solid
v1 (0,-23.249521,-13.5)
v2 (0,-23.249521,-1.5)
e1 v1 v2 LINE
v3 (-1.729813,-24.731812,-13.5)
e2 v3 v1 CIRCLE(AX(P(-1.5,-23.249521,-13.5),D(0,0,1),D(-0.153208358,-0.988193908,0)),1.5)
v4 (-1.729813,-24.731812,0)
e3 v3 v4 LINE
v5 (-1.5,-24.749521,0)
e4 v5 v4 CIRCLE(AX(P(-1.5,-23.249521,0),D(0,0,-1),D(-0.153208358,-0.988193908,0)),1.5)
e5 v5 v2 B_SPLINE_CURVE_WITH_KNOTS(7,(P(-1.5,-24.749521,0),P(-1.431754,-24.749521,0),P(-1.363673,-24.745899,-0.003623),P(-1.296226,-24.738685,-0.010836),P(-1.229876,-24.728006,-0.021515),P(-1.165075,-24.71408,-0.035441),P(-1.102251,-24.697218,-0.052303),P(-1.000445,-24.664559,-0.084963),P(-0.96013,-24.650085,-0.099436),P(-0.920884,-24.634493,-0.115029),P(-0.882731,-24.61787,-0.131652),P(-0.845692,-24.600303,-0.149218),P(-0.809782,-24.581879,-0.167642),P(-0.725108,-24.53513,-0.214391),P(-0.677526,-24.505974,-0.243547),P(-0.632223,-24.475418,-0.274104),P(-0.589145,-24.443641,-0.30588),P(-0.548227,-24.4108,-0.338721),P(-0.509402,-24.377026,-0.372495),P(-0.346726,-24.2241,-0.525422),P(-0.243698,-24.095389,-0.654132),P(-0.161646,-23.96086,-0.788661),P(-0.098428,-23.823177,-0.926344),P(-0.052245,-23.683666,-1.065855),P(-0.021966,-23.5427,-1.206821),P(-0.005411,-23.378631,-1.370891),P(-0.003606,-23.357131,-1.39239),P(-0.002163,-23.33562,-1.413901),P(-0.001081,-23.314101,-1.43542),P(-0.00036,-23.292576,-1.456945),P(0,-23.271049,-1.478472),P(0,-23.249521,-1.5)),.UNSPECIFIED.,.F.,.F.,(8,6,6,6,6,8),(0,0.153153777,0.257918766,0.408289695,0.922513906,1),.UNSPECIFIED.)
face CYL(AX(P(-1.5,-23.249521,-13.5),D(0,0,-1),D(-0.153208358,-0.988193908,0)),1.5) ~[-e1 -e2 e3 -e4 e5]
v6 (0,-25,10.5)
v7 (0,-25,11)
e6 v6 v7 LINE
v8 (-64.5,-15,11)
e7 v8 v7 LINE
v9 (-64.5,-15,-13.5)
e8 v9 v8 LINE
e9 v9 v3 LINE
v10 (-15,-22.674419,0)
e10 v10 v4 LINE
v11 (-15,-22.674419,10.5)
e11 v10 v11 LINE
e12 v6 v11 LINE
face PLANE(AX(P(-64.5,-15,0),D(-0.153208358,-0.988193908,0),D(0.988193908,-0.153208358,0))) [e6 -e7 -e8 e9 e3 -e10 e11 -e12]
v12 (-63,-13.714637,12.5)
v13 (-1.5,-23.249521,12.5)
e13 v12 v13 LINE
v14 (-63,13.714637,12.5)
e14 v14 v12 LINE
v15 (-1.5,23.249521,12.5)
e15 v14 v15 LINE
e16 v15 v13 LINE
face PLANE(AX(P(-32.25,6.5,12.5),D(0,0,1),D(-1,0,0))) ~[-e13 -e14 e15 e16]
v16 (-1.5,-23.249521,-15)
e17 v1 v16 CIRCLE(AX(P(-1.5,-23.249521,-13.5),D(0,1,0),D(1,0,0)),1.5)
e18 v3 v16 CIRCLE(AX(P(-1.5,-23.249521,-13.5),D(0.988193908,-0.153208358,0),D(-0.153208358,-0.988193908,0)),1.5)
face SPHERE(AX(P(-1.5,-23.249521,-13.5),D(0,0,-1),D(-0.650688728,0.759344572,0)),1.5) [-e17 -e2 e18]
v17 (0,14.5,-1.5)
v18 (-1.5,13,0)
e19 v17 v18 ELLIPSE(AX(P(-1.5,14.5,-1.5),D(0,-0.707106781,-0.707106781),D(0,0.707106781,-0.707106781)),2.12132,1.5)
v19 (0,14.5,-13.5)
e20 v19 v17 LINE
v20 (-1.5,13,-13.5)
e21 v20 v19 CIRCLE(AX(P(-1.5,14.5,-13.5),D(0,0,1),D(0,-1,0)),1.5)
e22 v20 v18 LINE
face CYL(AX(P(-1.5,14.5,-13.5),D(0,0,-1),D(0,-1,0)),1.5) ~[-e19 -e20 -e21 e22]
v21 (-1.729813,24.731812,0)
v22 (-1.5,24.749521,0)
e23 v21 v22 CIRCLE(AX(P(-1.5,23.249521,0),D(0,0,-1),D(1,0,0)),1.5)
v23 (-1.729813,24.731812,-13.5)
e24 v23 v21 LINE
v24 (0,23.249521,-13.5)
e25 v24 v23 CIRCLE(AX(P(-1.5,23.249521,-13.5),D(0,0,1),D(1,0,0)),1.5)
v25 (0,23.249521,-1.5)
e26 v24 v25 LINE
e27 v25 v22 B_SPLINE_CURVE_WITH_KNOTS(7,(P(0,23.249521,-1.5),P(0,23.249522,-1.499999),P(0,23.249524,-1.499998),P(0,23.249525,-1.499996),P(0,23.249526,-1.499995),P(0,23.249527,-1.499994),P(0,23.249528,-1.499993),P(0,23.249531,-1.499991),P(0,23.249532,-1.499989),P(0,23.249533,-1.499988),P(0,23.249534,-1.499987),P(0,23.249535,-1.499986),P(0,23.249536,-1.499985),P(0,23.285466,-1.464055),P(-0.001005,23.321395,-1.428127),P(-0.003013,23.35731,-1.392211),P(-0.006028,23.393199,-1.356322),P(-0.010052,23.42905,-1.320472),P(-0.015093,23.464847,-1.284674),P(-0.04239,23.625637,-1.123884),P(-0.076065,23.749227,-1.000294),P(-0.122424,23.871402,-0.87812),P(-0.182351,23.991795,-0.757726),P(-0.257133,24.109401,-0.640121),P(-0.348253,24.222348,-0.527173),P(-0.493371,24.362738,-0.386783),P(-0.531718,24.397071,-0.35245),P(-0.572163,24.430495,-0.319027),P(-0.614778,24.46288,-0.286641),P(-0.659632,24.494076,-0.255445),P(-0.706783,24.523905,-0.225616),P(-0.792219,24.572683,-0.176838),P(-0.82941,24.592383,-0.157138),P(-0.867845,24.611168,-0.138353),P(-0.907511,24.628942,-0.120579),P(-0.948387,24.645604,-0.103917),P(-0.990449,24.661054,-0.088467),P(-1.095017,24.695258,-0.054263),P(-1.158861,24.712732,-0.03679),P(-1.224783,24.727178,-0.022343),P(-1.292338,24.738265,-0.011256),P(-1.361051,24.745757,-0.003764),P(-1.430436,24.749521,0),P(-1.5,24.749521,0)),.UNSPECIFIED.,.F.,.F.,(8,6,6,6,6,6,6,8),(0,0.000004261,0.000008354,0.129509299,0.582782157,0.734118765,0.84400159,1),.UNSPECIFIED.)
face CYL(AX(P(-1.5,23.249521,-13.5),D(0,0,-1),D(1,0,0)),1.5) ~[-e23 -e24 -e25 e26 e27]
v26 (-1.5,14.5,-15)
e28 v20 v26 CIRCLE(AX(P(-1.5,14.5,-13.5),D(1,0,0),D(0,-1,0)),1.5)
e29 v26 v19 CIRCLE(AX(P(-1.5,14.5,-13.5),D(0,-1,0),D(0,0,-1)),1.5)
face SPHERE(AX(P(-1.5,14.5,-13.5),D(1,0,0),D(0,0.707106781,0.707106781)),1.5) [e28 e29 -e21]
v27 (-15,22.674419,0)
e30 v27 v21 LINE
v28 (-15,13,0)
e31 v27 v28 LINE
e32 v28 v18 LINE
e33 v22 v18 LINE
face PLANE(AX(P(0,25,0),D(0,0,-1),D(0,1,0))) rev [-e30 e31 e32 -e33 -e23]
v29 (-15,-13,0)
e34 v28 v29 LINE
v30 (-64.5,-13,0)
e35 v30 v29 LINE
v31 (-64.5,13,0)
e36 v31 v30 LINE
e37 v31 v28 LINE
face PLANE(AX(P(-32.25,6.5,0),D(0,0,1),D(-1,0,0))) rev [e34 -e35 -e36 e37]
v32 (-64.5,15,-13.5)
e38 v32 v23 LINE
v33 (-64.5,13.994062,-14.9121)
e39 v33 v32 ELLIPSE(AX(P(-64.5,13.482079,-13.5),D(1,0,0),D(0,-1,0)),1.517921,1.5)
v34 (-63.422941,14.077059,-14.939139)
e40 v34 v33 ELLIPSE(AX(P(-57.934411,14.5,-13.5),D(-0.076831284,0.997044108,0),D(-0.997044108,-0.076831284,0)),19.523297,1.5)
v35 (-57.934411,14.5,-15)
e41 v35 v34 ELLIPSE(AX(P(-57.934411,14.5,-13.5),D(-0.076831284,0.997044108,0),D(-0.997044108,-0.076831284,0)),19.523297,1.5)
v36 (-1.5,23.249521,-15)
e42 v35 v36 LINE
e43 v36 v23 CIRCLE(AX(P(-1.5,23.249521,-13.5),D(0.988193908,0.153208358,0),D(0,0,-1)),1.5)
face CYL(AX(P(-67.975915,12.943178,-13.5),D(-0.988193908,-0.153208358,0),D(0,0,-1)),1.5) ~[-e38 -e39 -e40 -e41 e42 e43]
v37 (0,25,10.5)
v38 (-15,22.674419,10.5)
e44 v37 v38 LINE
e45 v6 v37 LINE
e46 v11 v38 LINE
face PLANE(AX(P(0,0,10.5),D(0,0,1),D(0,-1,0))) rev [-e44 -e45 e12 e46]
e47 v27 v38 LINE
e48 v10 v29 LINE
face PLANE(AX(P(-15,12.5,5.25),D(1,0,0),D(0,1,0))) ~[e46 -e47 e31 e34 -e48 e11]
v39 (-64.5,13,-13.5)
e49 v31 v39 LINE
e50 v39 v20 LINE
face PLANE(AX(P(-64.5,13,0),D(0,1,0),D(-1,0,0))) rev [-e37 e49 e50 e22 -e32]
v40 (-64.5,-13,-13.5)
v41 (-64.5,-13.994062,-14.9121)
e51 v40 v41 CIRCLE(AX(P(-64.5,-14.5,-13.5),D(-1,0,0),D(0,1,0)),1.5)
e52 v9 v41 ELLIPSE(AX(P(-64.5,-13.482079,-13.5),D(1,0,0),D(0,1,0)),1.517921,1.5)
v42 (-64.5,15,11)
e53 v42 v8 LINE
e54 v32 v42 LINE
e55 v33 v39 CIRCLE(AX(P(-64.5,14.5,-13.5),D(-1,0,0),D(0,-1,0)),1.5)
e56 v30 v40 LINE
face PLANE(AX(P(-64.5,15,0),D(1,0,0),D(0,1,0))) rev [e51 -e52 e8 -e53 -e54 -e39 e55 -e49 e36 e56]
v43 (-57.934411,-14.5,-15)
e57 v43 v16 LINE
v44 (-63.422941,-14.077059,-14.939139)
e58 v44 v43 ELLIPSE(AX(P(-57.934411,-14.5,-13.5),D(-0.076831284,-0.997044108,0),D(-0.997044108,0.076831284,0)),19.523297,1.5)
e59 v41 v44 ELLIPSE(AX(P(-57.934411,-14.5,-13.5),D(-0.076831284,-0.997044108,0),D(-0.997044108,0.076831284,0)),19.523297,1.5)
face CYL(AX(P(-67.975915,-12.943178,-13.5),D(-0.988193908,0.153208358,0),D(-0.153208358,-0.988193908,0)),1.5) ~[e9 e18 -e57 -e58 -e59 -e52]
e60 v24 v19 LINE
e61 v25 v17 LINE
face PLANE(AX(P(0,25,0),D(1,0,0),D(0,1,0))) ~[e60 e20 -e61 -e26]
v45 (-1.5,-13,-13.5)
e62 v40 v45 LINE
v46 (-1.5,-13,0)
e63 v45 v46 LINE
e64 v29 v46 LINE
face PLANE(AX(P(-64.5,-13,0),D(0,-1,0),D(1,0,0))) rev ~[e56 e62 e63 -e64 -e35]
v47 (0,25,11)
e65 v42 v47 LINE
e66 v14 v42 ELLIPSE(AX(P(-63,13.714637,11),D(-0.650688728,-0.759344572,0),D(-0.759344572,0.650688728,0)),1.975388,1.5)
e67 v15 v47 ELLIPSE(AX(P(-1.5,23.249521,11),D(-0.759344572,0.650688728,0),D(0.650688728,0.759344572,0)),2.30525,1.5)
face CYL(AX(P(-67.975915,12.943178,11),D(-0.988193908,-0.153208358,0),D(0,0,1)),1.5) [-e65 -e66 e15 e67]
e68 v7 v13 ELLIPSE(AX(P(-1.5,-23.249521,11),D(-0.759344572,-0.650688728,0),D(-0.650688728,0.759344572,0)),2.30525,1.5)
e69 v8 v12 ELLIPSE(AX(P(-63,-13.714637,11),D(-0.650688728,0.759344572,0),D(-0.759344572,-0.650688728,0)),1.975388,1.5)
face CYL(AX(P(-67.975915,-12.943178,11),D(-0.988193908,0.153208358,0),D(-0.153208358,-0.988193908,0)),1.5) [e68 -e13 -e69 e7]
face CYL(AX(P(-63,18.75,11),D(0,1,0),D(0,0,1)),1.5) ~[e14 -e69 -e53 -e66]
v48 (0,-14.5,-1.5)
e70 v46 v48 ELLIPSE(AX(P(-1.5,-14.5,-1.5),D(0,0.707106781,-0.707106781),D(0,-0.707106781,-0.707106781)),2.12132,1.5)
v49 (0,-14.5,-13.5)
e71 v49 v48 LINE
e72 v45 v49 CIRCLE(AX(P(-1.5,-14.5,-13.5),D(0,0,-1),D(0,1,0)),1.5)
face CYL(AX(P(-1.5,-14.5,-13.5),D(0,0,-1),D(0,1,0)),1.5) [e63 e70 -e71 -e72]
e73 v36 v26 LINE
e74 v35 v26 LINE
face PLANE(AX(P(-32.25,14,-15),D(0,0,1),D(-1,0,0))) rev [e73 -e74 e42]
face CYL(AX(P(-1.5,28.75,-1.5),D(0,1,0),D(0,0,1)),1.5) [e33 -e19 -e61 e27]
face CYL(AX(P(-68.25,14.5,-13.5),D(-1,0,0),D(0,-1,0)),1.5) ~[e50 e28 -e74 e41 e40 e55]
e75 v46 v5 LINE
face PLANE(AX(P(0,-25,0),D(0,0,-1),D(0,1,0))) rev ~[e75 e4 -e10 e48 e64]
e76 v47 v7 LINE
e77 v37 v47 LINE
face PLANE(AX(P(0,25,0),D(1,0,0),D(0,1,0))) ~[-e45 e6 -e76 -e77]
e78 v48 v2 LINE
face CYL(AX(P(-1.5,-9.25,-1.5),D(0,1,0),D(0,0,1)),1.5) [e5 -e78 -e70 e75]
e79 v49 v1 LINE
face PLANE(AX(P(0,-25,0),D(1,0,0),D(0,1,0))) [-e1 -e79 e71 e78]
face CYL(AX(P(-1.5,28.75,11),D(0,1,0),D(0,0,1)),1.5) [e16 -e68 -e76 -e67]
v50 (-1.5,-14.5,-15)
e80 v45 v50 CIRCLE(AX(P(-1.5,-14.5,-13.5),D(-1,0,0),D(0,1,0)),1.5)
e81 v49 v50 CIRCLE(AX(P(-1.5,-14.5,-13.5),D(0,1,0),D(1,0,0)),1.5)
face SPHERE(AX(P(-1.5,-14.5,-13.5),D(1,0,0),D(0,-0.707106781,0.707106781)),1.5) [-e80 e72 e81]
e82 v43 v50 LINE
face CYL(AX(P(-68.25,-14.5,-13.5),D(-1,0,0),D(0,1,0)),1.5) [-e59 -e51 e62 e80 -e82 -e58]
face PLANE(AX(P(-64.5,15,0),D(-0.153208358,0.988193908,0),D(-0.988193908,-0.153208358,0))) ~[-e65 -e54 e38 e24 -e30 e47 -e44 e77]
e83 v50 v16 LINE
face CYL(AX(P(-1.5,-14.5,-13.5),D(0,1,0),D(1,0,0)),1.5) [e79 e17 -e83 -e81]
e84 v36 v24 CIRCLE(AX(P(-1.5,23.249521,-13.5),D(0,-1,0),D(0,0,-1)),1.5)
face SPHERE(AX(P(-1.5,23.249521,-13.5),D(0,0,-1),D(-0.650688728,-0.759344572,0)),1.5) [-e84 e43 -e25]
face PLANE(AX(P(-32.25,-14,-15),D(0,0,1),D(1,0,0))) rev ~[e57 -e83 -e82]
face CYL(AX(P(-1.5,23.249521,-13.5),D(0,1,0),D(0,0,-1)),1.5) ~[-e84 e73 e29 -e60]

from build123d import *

# Parameters (mm, degrees)
F0_W         = 64.5
F0_H         = 13
F0_H_2       = 2
F1_DEPTH     = 12.5
F2_DEPTH     = 15
F4_DEPTH     = 15
F6_T1_DEPTH  = 72.7705906209
F6_T3_DEPTH  = 57.5
F6_T5_DEPTH  = 72.7705906209
F6_T7_DEPTH  = 37.5
F6_T9_DEPTH  = 66.75
F6_T11_DEPTH = 67.2701117692
F6_T13_DEPTH = 8.7495211484
F6_T15_DEPTH = 67.2701117692
F6_T17_DEPTH = 8.7495211484
F6_T19_DEPTH = 17.8761971291
F6_T21_DEPTH = 17.25
F6_T23_DEPTH = 19.5
F6_T25_DEPTH = 19.5
F6_S29_W     = 1.53
F6_S29_H     = 1.53
F6_T30_DEPTH = 1.53
F6_T36_DEPTH = 1.53
F6_S41_W     = 1.53
F6_S41_H     = 1.53
F6_T42_DEPTH = 1.53
F6_T48_DEPTH = 1.53
F6_T54_DEPTH = 9.5
F6_S55_R     = 1.5
F6_T56_DEPTH = 6
F6_T60_DEPTH = 9.5
F6_S61_R     = 1.5
F6_T62_DEPTH = 6
F6_T66_DEPTH = 9.5
F6_S67_R     = 1.5
F6_T68_DEPTH = 6
F6_T72_DEPTH = 9.5
F6_S73_R     = 1.5
F6_T74_DEPTH = 6


# Not quite as in the source:
# - a fillet or chamfer that OpenCascade refuses, or shapes differently, is made with other operations: its cross-section is extruded or revolved along the edge and cut away or added
# - a feature names something its author has since deleted; it is built from what else it names


with BuildPart() as f1:
    # F0 (on Top) → F1 (new body)
    with BuildSketch(Plane.XY):
        with Locations((-32.25, -6.5)):
            Rectangle(F0_W, F0_H)
        with Locations((-32.25, -14)):
            Rectangle(F0_W, F0_H_2)
        Polygon((0, -15), (-64.5, -15), (0, -25), align=None)
    extrude(amount=F1_DEPTH)

    # F0 (on Top) → F2 (join)
    with BuildSketch(Plane.XY):
        with Locations((-32.25, -14)):
            Rectangle(F0_W, F0_H_2)
        Polygon((0, -15), (-64.5, -15), (0, -25), align=None)
    extrude(amount=-F2_DEPTH)

    # F3 (on face) → F4 (cut)
    with BuildSketch(Plane.YZ):
        Polygon((-13, 0), (0, 0), (0, 10.5), (-25, 10.5), (-25, 0), align=None)
    extrude(amount=-F4_DEPTH, mode=Mode.SUBTRACT)

    # F5: F1 across plane


with BuildPart() as f1_1:
    add(f1.part)
    add(f1.part.mirror(Plane.XZ))

    # F6: fillet of radius 1.5 on 18 edges, made by hand

    # F6_s2 → F6_t1 (cut)
    with BuildSketch(Plane(origin=(-64.4207380098, 9.9877113194, 0), x_dir=(0, 0, 1), z_dir=(0.9881939076, -0.1532083578, 0))):
        with BuildLine():
            ThreePointArc((11, 24.7048476911), (12.0606601718, 24.2655078629), (12.5, 23.2048476911))
            Line((12.5, 23.2048476911), (12.5, 24.7048476911))
            Line((12.5, 24.7048476911), (11, 24.7048476911))
        make_face()
    extrude(amount=F6_T1_DEPTH, mode=Mode.SUBTRACT)

    # F6_s4 → F6_t3 (cut)
    with BuildSketch(Plane.XZ.offset(-28.75)):
        with BuildLine():
            ThreePointArc((-1.5, 12.5), (-0.4393398282, 12.0606601718), (0, 11))
            Line((0, 11), (0, 12.5))
            Line((0, 12.5), (-1.5, 12.5))
        make_face()
    extrude(amount=F6_T3_DEPTH, mode=Mode.SUBTRACT)

    # F6_s6 → F6_t5 (cut)
    with BuildSketch(Plane(origin=(-64.4207380098, -9.9877113194, 0), x_dir=(0, 0, 1), z_dir=(0.9881939076, 0.1532083578, 0))):
        with BuildLine():
            ThreePointArc((12.5, -23.2048476911), (12.0606601718, -24.2655078629), (11, -24.7048476911))
            Line((11, -24.7048476911), (12.5, -24.7048476911))
            Line((12.5, -24.7048476911), (12.5, -23.2048476911))
        make_face()
    extrude(amount=F6_T5_DEPTH, mode=Mode.SUBTRACT)

    # F6_s8 → F6_t7 (cut)
    with BuildSketch(Plane.XZ.offset(-18.75)):
        with BuildLine():
            ThreePointArc((-63, 12.5), (-64.0606601718, 12.0606601718), (-64.5, 11))
            Line((-64.5, 11), (-64.5, 12.5))
            Line((-64.5, 12.5), (-63, 12.5))
        make_face()
    extrude(amount=F6_T7_DEPTH, mode=Mode.SUBTRACT)

    # F6_s10 → F6_t9 (cut)
    with BuildSketch(Plane.YZ.offset(-68.25)):
        with BuildLine():
            ThreePointArc((-13, -13.5), (-13.4393398282, -14.5606601718), (-14.5, -15))
            Line((-14.5, -15), (-13, -15))
            Line((-13, -15), (-13, -13.5))
        make_face()
        with BuildLine():
            ThreePointArc((13, -13.5), (13.4393398282, -14.5606601718), (14.5, -15))
            Line((14.5, -15), (13, -15))
            Line((13, -15), (13, -13.5))
        make_face()
    extrude(amount=F6_T9_DEPTH, mode=Mode.SUBTRACT)

    # F6_s12 → F6_t11 (cut)
    with BuildSketch(Plane(origin=(-64.4207380098, 9.9877113194, 0), x_dir=(0, 0, 1), z_dir=(0.9881939076, -0.1532083578, 0))):
        with BuildLine():
            ThreePointArc((-13.5, 24.7048476911), (-14.5606601718, 24.2655078629), (-15, 23.2048476911))
            Line((-15, 23.2048476911), (-15, 24.7048476911))
            Line((-15, 24.7048476911), (-13.5, 24.7048476911))
        make_face()
    extrude(amount=F6_T11_DEPTH, mode=Mode.SUBTRACT)

    # F6_s14 → F6_t13 (cut)
    with BuildSketch(Plane.XZ.offset(14.5)):
        with BuildLine():
            ThreePointArc((0, -13.5), (-0.4393398282, -14.5606601718), (-1.5, -15))
            Line((-1.5, -15), (0, -15))
            Line((0, -15), (0, -13.5))
        make_face()
    extrude(amount=F6_T13_DEPTH, mode=Mode.SUBTRACT)

    # F6_s16 → F6_t15 (cut)
    with BuildSketch(Plane(origin=(-64.4207380098, -9.9877113194, 0), x_dir=(0, 0, 1), z_dir=(0.9881939076, 0.1532083578, 0))):
        with BuildLine():
            ThreePointArc((-15, -23.2048476911), (-14.5606601718, -24.2655078629), (-13.5, -24.7048476911))
            Line((-13.5, -24.7048476911), (-15, -24.7048476911))
            Line((-15, -24.7048476911), (-15, -23.2048476911))
        make_face()
    extrude(amount=F6_T15_DEPTH, mode=Mode.SUBTRACT)

    # F6_s18 → F6_t17 (cut)
    with BuildSketch(Plane.XZ.offset(-23.2495211484)):
        with BuildLine():
            ThreePointArc((-1.5, -15), (-0.4393398282, -14.5606601718), (0, -13.5))
            Line((0, -13.5), (0, -15))
            Line((0, -15), (-1.5, -15))
        make_face()
    extrude(amount=F6_T17_DEPTH, mode=Mode.SUBTRACT)

    # F6_s20 → F6_t19 (cut)
    with BuildSketch(Plane.XY.offset(-13.5)):
        with BuildLine():
            ThreePointArc((-1.7298125367, -24.7318120098), (-0.5239669076, -24.3885380062), (0, -23.2495211484))
            Line((0, -23.2495211484), (0, -25))
            Line((0, -25), (-1.7298125367, -24.7318120098))
        make_face()
        with BuildLine():
            ThreePointArc((0, 23.2495211484), (-0.5239669076, 24.3885380062), (-1.7298125367, 24.7318120098))
            Line((-1.7298125367, 24.7318120098), (0, 25))
            Line((0, 25), (0, 23.2495211484))
        make_face()
    extrude(amount=F6_T19_DEPTH, mode=Mode.SUBTRACT)

    # F6_s22 → F6_t21 (cut)
    with BuildSketch(Plane.XY.offset(-13.5)):
        with BuildLine():
            ThreePointArc((-1.5, -13), (-0.4393398282, -13.4393398282), (0, -14.5))
            Line((0, -14.5), (0, -13))
            Line((0, -13), (-1.5, -13))
        make_face()
        with BuildLine():
            ThreePointArc((-1.5, 13), (-0.4393398282, 13.4393398282), (0, 14.5))
            Line((0, 14.5), (0, 13))
            Line((0, 13), (-1.5, 13))
        make_face()
    extrude(amount=F6_T21_DEPTH, mode=Mode.SUBTRACT)

    # F6_s24 → F6_t23 (cut)
    with BuildSketch(Plane.XZ.offset(9.25)):
        with BuildLine():
            ThreePointArc((-1.5, 0), (-0.4393398282, -0.4393398282), (0, -1.5))
            Line((0, -1.5), (0, 0))
            Line((0, 0), (-1.5, 0))
        make_face()
    extrude(amount=F6_T23_DEPTH, mode=Mode.SUBTRACT)

    # F6_s26 → F6_t25 (cut)
    with BuildSketch(Plane.XZ.offset(-28.75)):
        with BuildLine():
            ThreePointArc((-1.5, 0), (-0.4393398282, -0.4393398282), (0, -1.5))
            Line((0, -1.5), (0, 0))
            Line((0, 0), (-1.5, 0))
        make_face()
    extrude(amount=F6_T25_DEPTH, mode=Mode.SUBTRACT)


with BuildPart() as f6_tool28:
    # F6_s29 → F6_t30 (new body)
    with BuildSketch(Plane.YZ.offset(-1.5)):
        with Locations((-13.735, -14.265)):
            Rectangle(F6_S29_W, F6_S29_H)
    extrude(amount=F6_T30_DEPTH)

    # F6_s31 → F6_t32 (revolve, cut)
    with BuildSketch(Plane(origin=(-1.5, -14.5, -13.5), x_dir=(0, -0.7071067812, 0.7071067812), z_dir=(0, 0.7071067812, 0.7071067812))):
        with BuildLine():
            ThreePointArc((0, -1.5), (1.5, 0), (0, 1.5))
            Line((0, 1.5), (0, -1.5))
        make_face()
    revolve(axis=Axis((-1.5, -14.5, -13.5), (1, 0, 0)), mode=Mode.SUBTRACT)


with BuildPart() as f1_2:
    add(f1_1.part)

    # F6_t27: cut F6_tool28
    add(f6_tool28.part, mode=Mode.SUBTRACT)


with BuildPart() as f6_tool34:
    # F6_s35 → F6_t36 (new body)
    with BuildSketch(Plane.XY.offset(-13.5)):
        Polygon((-1.5, -23.2495211484), (-1.7344087874, -24.761457827), (0.03, -25.035009577), (0.03, -23.2495211484), align=None)
    extrude(amount=-F6_T36_DEPTH)

    # F6_s37 → F6_t38 (revolve, cut)
    with BuildSketch(Plane(origin=(-1.5, -23.2495211484, -13.5), x_dir=(-0.6506887283, 0.7593445719, 0), z_dir=(-0.7593445719, -0.6506887283, 0))):
        with BuildLine():
            ThreePointArc((0, -1.5), (1.5, 0), (0, 1.5))
            Line((0, 1.5), (0, -1.5))
        make_face()
    revolve(axis=Axis((-1.5, -23.2495211484, -13.5), (0, 0, -1)), mode=Mode.SUBTRACT)


with BuildPart() as f1_3:
    add(f1_2.part)

    # F6_t33: cut F6_tool34
    add(f6_tool34.part, mode=Mode.SUBTRACT)


with BuildPart() as f6_tool40:
    # F6_s41 → F6_t42 (new body)
    with BuildSketch(Plane.YZ.offset(-1.5)):
        with Locations((13.735, -14.265)):
            Rectangle(F6_S41_W, F6_S41_H)
    extrude(amount=F6_T42_DEPTH)

    # F6_s43 → F6_t44 (revolve, cut)
    with BuildSketch(Plane(origin=(-1.5, 14.5, -13.5), x_dir=(0, 0.7071067812, 0.7071067812), z_dir=(0, 0.7071067812, -0.7071067812))):
        with BuildLine():
            ThreePointArc((0, -1.5), (1.5, 0), (0, 1.5))
            Line((0, 1.5), (0, -1.5))
        make_face()
    revolve(axis=Axis((-1.5, 14.5, -13.5), (1, 0, 0)), mode=Mode.SUBTRACT)


with BuildPart() as f1_4:
    add(f1_3.part)

    # F6_t39: cut F6_tool40
    add(f6_tool40.part, mode=Mode.SUBTRACT)


with BuildPart() as f6_tool46:
    # F6_s47 → F6_t48 (new body)
    with BuildSketch(Plane.XY.offset(-13.5)):
        Polygon((-1.5, 23.2495211484), (0.03, 23.2495211484), (0.03, 25.035009577), (-1.7344087874, 24.761457827), align=None)
    extrude(amount=-F6_T48_DEPTH)

    # F6_s49 → F6_t50 (revolve, cut)
    with BuildSketch(Plane(origin=(-1.5, 23.2495211484, -13.5), x_dir=(-0.6506887283, -0.7593445719, 0), z_dir=(0.7593445719, -0.6506887283, 0))):
        with BuildLine():
            ThreePointArc((0, -1.5), (1.5, 0), (0, 1.5))
            Line((0, 1.5), (0, -1.5))
        make_face()
    revolve(axis=Axis((-1.5, 23.2495211484, -13.5), (0, 0, -1)), mode=Mode.SUBTRACT)


with BuildPart() as f1_5:
    add(f1_4.part)

    # F6_t45: cut F6_tool46
    add(f6_tool46.part, mode=Mode.SUBTRACT)


with BuildPart() as f6_tool52:
    # F6_s53 → F6_t54 (new body)
    with BuildSketch(Plane.XZ.offset(9.25)):
        with BuildLine():
            ThreePointArc((-63, -15), (-64.0606601718, -14.5606601718), (-64.5, -13.5))
            Line((-64.5, -13.5), (-64.5, -15))
            Line((-64.5, -15), (-63, -15))
        make_face()
    extrude(amount=F6_T54_DEPTH)

    # F6_s55 → F6_t56 (cut, symmetric)
    with BuildSketch(Plane(origin=(-60.1810089756, 9.3303889885, 0), x_dir=(0, 0, 1), z_dir=(-0.9881939076, 0.1532083578, 0))):
        with Locations((-13.5, -23.2048476911)):
            Circle(F6_S55_R)
    extrude(amount=F6_T56_DEPTH, both=True, mode=Mode.SUBTRACT)


with BuildPart() as f1_6:
    add(f1_5.part)

    # F6_t51: cut F6_tool52
    add(f6_tool52.part, mode=Mode.SUBTRACT)


with BuildPart() as f6_tool58:
    # F6_s59 → F6_t60 (new body)
    with BuildSketch(Plane.XZ.offset(9.25)):
        with BuildLine():
            ThreePointArc((-63, -15), (-64.0606601718, -14.5606601718), (-64.5, -13.5))
            Line((-64.5, -13.5), (-64.5, -15))
            Line((-64.5, -15), (-63, -15))
        make_face()
    extrude(amount=F6_T60_DEPTH)

    # F6_s61 → F6_t62 (cut, symmetric)
    with BuildSketch(Plane.YZ.offset(-63.8)):
        with Locations((-14.5, -13.5)):
            Circle(F6_S61_R)
    extrude(amount=F6_T62_DEPTH, both=True, mode=Mode.SUBTRACT)


with BuildPart() as f1_7:
    add(f1_6.part)

    # F6_t57: cut F6_tool58
    add(f6_tool58.part, mode=Mode.SUBTRACT)


with BuildPart() as f6_tool64:
    # F6_s65 → F6_t66 (new body)
    with BuildSketch(Plane.XZ.offset(-9.25)):
        with BuildLine():
            ThreePointArc((-63, -15), (-64.0606601718, -14.5606601718), (-64.5, -13.5))
            Line((-64.5, -13.5), (-64.5, -15))
            Line((-64.5, -15), (-63, -15))
        make_face()
    extrude(amount=-F6_T66_DEPTH)

    # F6_s67 → F6_t68 (cut, symmetric)
    with BuildSketch(Plane(origin=(-60.1810089756, -9.3303889885, 0), x_dir=(0, 0, 1), z_dir=(-0.9881939076, -0.1532083578, 0))):
        with Locations((-13.5, 23.2048476911)):
            Circle(F6_S67_R)
    extrude(amount=F6_T68_DEPTH, both=True, mode=Mode.SUBTRACT)


with BuildPart() as f1_8:
    add(f1_7.part)

    # F6_t63: cut F6_tool64
    add(f6_tool64.part, mode=Mode.SUBTRACT)


with BuildPart() as f6_tool70:
    # F6_s71 → F6_t72 (new body)
    with BuildSketch(Plane.XZ.offset(-9.25)):
        with BuildLine():
            ThreePointArc((-63, -15), (-64.0606601718, -14.5606601718), (-64.5, -13.5))
            Line((-64.5, -13.5), (-64.5, -15))
            Line((-64.5, -15), (-63, -15))
        make_face()
    extrude(amount=-F6_T72_DEPTH)

    # F6_s73 → F6_t74 (cut, symmetric)
    with BuildSketch(Plane.YZ.offset(-63.8)):
        with Locations((14.5, -13.5)):
            Circle(F6_S73_R)
    extrude(amount=F6_T74_DEPTH, both=True, mode=Mode.SUBTRACT)


with BuildPart() as f1_9:
    add(f1_8.part)

    # F6_t69: cut F6_tool70
    add(f6_tool70.part, mode=Mode.SUBTRACT)


solid = f1_9.part
